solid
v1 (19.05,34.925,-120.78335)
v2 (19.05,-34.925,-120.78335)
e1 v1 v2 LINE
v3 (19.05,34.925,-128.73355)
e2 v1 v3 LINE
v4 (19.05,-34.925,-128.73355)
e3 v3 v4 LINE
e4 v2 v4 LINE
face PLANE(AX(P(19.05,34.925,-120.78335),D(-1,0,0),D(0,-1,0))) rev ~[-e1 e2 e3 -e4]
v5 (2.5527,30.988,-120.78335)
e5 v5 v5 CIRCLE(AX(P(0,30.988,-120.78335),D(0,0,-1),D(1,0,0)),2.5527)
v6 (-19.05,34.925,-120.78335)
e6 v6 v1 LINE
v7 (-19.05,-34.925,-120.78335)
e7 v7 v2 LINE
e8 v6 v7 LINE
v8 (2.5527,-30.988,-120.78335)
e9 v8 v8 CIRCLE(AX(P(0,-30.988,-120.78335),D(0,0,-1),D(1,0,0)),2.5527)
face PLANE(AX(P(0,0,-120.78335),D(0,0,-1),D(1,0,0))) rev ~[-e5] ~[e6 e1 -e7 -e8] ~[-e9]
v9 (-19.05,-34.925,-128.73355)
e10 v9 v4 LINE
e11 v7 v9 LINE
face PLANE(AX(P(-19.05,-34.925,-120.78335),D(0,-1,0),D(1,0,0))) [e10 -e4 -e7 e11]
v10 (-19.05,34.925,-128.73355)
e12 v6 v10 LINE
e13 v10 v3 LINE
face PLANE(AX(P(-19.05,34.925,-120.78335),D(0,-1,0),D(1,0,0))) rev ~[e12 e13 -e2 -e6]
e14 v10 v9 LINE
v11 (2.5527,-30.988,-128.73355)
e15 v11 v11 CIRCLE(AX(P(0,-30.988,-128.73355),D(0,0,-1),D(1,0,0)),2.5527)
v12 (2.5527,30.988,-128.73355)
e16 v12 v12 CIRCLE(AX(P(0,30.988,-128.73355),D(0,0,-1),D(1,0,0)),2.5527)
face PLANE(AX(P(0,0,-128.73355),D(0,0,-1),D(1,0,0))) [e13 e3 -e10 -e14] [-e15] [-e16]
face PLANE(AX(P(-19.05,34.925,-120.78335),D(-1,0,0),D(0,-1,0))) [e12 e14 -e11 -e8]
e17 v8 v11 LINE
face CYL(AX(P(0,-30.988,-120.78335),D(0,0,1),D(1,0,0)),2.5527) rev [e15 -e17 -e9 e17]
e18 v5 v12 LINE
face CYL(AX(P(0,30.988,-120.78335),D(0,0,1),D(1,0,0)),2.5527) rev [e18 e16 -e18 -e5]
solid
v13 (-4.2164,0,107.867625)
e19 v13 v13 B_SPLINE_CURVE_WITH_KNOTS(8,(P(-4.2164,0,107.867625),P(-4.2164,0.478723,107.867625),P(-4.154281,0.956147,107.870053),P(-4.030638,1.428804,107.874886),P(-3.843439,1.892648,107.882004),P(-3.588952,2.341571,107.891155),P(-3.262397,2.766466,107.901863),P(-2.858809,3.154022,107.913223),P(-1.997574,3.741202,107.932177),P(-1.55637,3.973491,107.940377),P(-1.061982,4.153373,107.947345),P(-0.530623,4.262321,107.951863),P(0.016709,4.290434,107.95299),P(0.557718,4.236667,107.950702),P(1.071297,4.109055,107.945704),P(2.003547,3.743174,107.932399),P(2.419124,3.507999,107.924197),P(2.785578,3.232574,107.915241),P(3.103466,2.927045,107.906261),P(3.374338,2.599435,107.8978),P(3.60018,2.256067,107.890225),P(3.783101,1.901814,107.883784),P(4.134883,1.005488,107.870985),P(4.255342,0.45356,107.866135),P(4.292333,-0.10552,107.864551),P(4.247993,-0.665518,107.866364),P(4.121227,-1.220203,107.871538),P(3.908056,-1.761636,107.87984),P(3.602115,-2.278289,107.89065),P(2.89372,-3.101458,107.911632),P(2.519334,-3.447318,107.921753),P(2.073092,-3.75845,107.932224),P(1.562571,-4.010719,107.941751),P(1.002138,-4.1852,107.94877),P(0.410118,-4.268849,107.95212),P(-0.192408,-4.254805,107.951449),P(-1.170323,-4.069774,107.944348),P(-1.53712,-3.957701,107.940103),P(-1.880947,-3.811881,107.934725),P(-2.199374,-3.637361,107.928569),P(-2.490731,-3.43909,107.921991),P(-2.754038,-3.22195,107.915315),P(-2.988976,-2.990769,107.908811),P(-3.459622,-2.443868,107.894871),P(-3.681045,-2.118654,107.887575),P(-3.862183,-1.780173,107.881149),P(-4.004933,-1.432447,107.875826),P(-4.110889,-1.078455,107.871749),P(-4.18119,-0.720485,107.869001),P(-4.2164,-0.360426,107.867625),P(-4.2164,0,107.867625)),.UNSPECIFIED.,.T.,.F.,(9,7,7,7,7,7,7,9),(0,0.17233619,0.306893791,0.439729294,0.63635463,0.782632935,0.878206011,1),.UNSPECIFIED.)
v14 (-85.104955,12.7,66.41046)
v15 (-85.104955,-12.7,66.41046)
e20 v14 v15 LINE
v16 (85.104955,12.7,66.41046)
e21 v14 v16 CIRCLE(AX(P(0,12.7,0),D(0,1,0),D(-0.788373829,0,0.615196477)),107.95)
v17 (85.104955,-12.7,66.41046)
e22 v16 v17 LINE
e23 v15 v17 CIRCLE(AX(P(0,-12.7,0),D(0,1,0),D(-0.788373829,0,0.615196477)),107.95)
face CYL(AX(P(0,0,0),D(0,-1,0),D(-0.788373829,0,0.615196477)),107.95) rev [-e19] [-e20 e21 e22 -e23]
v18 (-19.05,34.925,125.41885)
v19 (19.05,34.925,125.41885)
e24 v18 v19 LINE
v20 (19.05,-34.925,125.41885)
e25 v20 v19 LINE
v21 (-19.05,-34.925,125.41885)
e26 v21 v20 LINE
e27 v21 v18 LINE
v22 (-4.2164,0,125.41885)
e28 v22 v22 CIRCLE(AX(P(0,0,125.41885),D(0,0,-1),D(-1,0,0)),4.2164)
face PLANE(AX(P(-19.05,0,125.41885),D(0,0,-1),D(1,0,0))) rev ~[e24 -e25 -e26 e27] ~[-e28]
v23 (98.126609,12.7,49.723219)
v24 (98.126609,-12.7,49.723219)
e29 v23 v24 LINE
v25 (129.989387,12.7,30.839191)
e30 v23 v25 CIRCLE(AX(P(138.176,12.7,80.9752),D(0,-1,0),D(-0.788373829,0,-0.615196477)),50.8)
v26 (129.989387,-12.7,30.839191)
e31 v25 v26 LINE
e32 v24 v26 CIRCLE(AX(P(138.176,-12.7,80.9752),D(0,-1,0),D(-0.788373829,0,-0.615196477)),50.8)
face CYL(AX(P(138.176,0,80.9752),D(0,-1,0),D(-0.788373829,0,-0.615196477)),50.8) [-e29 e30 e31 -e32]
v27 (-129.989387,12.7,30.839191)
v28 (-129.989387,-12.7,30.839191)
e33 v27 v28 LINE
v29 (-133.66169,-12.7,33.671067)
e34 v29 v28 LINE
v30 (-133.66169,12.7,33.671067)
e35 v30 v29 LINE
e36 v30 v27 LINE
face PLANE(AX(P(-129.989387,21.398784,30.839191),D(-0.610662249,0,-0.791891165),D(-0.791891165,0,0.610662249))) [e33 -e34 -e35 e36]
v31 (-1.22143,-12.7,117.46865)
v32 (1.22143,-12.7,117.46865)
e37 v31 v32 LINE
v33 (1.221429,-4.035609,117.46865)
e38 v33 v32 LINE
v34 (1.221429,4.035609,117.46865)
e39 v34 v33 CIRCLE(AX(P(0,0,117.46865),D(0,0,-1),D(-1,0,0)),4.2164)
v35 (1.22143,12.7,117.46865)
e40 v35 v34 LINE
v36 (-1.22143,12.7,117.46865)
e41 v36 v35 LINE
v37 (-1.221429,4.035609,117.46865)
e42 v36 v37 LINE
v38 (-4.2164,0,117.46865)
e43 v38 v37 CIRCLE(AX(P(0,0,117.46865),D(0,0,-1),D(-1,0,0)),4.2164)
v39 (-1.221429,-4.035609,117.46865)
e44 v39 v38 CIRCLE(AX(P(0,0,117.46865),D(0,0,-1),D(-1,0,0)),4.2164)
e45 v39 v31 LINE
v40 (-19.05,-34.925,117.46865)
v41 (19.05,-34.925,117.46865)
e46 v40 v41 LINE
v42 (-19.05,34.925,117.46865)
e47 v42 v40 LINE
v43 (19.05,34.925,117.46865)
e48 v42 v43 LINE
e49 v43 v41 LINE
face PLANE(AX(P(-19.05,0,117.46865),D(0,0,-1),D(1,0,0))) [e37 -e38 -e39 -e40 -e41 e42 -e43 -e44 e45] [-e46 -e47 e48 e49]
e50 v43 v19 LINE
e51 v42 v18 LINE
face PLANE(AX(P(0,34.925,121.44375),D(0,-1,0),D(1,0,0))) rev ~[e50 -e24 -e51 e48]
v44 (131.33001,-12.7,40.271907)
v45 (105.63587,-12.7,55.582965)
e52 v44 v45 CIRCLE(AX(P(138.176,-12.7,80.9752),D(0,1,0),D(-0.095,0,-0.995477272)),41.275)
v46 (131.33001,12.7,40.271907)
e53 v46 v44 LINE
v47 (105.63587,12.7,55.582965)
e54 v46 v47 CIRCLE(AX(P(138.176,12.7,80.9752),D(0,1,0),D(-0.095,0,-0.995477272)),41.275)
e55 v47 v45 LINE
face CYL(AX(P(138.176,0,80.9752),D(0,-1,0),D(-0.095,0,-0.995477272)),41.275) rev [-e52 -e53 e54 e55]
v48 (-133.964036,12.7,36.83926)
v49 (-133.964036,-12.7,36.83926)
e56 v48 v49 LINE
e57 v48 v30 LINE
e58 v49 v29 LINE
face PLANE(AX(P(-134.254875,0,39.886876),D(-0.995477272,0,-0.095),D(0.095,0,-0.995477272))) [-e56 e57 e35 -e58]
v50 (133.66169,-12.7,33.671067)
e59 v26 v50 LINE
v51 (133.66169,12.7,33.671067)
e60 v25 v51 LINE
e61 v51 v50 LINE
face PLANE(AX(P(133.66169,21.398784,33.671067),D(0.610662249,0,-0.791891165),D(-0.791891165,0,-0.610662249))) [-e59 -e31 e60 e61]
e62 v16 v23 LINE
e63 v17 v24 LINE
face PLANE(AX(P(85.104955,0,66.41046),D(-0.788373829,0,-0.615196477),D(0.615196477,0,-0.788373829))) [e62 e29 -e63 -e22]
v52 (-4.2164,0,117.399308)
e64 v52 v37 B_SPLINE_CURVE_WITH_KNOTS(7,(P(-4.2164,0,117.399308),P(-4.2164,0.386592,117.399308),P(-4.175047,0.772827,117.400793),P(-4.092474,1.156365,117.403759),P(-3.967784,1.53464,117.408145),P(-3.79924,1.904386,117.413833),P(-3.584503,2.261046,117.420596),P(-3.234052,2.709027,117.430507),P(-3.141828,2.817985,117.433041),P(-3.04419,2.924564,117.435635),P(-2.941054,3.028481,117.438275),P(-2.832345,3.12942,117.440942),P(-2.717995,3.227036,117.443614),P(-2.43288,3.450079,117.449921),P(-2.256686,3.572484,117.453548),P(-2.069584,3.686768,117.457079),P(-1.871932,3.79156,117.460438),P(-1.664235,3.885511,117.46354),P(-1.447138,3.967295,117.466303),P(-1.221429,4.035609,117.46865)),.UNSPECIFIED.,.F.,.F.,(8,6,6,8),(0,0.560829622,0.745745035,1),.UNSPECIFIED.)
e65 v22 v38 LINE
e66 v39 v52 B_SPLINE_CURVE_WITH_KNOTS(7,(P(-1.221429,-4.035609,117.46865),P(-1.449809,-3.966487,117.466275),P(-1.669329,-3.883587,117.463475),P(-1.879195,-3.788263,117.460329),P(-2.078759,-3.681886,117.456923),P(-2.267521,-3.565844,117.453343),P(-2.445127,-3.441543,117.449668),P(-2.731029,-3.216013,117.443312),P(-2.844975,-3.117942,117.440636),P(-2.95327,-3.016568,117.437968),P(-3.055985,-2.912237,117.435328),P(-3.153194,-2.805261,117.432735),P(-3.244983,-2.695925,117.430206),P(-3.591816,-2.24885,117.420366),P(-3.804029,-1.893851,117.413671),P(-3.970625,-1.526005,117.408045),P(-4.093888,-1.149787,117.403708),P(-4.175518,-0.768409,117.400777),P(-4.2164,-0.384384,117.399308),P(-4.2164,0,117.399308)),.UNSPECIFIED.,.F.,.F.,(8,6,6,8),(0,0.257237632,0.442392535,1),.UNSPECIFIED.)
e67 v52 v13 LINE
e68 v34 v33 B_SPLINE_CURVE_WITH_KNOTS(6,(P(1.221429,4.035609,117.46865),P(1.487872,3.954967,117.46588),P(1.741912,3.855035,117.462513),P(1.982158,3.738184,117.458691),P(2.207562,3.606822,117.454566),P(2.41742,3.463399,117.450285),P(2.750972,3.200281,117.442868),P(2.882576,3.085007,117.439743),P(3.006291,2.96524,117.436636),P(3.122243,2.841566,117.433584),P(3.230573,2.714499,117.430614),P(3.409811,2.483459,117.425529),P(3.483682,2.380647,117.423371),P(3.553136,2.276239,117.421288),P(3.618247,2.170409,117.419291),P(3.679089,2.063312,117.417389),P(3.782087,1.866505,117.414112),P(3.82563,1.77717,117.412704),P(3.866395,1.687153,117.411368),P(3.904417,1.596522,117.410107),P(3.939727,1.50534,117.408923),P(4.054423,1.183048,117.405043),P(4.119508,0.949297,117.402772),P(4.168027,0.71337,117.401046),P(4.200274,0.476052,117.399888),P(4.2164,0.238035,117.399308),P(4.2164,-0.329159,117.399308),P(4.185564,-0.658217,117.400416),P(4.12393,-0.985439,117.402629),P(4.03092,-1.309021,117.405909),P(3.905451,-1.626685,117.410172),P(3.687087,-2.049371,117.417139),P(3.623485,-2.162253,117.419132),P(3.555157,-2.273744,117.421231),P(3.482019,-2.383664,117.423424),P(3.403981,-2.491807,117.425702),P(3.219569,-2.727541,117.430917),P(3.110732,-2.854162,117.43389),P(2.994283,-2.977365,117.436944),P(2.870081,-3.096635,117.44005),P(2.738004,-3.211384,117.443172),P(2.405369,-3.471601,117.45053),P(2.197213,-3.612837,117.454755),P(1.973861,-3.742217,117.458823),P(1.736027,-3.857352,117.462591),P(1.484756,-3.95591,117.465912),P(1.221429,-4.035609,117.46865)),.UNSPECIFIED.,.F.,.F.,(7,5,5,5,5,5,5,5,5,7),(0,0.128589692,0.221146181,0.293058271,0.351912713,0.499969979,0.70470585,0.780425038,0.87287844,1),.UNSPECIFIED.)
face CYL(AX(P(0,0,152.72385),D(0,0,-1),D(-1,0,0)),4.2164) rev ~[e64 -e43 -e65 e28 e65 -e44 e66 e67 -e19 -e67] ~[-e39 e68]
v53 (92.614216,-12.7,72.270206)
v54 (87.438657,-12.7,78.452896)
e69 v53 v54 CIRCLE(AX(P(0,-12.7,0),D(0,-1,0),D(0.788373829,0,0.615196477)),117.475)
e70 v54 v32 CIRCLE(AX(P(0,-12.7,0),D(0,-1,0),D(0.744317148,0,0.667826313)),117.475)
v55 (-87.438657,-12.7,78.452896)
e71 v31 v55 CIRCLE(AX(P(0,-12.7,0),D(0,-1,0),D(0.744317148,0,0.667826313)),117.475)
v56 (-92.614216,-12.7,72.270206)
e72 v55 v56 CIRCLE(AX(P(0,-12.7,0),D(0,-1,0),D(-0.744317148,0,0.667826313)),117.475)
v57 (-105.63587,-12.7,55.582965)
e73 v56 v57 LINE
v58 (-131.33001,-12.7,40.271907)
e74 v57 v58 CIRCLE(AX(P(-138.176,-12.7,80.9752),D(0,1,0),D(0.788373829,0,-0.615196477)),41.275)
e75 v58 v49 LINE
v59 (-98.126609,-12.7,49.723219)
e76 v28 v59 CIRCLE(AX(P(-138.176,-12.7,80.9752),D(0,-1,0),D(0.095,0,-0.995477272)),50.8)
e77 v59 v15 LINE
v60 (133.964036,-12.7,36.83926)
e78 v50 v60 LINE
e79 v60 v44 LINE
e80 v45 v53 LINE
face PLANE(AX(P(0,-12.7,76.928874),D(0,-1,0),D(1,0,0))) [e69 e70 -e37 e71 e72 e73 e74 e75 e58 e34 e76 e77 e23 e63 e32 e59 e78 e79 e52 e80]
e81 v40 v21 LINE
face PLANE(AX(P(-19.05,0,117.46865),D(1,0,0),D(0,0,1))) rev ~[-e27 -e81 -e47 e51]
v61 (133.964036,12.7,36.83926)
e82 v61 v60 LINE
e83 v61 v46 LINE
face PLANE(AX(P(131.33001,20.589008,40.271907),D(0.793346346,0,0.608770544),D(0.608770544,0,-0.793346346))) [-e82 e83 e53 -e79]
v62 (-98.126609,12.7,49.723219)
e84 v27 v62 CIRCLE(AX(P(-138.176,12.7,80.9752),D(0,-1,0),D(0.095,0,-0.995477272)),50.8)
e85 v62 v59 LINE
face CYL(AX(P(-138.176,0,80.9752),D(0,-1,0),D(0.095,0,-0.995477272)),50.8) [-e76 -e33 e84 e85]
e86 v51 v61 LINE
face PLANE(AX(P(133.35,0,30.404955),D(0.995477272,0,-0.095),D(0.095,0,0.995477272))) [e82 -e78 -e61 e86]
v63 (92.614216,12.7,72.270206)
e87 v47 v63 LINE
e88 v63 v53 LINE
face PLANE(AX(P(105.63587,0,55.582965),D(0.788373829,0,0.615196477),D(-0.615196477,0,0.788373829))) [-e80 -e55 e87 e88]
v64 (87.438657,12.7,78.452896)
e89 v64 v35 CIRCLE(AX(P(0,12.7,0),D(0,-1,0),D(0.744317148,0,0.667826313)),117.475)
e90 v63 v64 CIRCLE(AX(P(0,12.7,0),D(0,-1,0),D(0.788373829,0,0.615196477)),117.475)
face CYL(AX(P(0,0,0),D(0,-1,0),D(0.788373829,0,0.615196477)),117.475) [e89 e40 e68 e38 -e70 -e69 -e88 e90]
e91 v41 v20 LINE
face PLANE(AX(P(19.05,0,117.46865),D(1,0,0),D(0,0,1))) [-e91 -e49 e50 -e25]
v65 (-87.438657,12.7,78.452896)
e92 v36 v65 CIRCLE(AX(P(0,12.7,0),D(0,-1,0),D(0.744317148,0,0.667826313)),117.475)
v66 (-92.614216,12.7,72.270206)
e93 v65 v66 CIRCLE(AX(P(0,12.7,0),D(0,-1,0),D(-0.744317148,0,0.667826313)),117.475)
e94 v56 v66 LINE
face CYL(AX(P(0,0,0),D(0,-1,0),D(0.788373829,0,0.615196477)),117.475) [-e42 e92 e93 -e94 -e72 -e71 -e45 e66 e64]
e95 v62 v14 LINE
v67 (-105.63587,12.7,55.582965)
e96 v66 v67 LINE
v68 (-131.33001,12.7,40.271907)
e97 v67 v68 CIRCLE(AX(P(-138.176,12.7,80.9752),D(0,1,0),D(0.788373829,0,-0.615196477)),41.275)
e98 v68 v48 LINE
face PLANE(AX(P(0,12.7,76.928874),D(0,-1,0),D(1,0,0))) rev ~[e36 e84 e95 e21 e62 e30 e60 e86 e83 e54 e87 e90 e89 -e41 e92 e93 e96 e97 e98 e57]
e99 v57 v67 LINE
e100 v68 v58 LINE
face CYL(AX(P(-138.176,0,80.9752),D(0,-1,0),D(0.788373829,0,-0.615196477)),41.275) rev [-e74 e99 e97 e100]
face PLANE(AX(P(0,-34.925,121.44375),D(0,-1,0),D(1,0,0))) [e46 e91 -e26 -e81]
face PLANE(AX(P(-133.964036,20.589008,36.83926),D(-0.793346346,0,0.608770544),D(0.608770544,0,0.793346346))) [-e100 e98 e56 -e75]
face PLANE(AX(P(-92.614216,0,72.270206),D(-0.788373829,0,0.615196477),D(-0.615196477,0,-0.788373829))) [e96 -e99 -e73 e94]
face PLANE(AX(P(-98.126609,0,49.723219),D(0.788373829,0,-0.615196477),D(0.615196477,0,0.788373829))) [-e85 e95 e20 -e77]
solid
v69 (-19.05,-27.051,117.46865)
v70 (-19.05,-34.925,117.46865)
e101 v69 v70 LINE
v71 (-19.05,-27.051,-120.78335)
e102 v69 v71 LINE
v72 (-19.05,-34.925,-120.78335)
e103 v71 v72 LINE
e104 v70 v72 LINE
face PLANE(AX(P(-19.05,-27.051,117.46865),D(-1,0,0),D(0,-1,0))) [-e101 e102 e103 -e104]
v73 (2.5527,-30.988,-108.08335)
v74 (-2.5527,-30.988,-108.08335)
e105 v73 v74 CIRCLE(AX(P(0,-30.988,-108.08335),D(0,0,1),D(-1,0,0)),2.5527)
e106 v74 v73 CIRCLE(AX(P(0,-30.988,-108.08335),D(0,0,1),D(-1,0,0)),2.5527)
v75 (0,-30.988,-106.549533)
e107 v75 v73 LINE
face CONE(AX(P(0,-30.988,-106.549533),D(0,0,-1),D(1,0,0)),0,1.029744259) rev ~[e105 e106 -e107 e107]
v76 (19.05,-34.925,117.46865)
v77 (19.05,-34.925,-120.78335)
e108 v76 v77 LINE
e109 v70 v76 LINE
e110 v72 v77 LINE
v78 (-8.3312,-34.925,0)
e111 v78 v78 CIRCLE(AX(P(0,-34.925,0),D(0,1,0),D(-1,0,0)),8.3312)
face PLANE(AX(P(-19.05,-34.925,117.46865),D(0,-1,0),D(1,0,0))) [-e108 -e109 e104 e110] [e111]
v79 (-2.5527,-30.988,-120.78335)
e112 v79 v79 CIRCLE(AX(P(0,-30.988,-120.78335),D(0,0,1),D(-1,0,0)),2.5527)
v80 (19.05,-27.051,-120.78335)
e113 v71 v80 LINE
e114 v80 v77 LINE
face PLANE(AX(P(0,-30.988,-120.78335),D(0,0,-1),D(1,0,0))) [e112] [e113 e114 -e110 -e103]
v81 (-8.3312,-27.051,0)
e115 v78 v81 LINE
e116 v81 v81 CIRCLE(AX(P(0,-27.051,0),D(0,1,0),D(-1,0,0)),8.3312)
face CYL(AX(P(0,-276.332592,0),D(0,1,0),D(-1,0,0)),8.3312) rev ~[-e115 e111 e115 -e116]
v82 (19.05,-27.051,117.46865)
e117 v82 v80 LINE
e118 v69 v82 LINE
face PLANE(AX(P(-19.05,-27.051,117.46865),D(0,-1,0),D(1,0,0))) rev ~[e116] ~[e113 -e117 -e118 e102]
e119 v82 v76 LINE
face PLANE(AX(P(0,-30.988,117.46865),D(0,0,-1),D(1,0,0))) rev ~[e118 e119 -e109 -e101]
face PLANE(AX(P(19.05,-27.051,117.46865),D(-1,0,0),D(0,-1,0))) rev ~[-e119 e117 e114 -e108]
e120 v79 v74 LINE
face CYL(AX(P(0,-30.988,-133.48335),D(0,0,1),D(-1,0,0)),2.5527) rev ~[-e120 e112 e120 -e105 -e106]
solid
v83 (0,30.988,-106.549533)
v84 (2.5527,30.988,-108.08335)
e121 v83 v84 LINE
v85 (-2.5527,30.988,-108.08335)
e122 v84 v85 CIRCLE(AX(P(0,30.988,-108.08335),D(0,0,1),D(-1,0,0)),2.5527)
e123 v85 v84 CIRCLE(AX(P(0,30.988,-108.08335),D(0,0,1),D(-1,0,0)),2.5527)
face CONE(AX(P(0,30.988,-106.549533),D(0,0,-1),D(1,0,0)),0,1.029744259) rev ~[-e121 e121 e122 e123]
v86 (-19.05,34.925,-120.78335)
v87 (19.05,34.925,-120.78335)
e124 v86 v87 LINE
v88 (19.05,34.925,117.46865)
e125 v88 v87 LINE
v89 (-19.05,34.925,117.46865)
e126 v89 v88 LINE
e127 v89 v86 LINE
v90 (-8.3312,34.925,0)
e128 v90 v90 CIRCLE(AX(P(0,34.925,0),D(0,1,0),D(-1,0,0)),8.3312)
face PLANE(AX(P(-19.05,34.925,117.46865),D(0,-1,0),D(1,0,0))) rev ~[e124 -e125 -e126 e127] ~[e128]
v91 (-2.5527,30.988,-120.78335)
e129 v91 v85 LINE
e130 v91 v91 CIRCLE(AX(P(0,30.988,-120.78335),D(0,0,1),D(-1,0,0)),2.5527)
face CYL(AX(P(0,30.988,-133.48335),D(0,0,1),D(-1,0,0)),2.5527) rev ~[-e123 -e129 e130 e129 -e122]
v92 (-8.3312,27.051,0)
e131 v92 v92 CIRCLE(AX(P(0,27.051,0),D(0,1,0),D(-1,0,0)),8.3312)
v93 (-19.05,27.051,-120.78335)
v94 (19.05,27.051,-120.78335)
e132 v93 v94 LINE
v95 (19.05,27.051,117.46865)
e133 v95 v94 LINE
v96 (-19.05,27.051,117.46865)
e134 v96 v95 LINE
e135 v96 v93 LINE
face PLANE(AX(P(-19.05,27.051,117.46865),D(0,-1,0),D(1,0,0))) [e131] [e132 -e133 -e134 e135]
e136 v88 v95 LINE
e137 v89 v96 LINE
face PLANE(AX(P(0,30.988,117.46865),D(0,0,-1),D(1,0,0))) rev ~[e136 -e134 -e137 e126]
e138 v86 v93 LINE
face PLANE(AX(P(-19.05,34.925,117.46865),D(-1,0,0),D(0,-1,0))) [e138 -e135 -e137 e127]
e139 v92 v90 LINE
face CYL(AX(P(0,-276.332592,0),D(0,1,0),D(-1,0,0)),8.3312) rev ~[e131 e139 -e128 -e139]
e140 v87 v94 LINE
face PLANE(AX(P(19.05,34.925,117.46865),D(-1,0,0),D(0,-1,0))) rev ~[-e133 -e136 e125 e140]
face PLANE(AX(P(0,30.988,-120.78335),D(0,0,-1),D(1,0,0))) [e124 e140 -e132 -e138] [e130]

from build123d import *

# Parameters (mm, degrees)
F1_DEPTH    = 12.7
F2_T1_DEPTH = 41.1780168926
F2_T3_DEPTH = 42.797567125
F3_W        = 38.1
F3_H        = 7.9502
F4_DEPTH    = 34.925
F5_W        = 38.1
F5_H        = 7.874
F6_DEPTH    = 238.252
F8_D        = 16.6624
F8_2_D      = 16.6624
F10_D       = 5.1054
F10_DEPTH   = 12.7
F10_TIP     = 1.5338169022
F10_2_D     = 5.1054
F10_2_DEPTH = 12.7
F10_2_TIP   = 1.5338169022
F12_D       = 8.4328
F12_DEPTH   = 27.305
F12_TIP     = 2.5334687141
F13_W       = 38.1
F13_H       = 69.85
F13_R       = 2.5527
F14_DEPTH   = 7.9502


# Not quite as in the source:
# - a fillet or chamfer that OpenCascade refuses, or shapes differently, is made with other operations: its cross-section is extruded or revolved along the edge and cut away or added


with BuildPart() as f1:
    # F0 (on Front) → F1 (new body, symmetric)
    with BuildSketch(Plane.XZ):
        with BuildLine():
            Line((-134.254875, 39.8868755789), (-133.35, 30.4049545586))
            ThreePointArc((-133.35, 30.4049545586), (-113.74755339, 36.4343087177), (-98.1266094704, 49.7232189715))
            Line((-98.1266094704, 49.7232189715), (-85.1049548754, 66.4104596856))
            ThreePointArc((-85.1049548754, 66.4104596856), (0, 107.95), (85.1049548754, 66.4104596856))
            Line((85.1049548754, 66.4104596856), (98.1266094704, 49.7232189715))
            ThreePointArc((98.1266094704, 49.7232189715), (113.74755339, 36.4343087177), (133.35, 30.4049545586))
            Line((133.35, 30.4049545586), (134.254875, 39.8868755789))
            ThreePointArc((134.254875, 39.8868755789), (118.3278871294, 44.7857258331), (105.6358701947, 55.5829654143))
            Line((105.6358701947, 55.5829654143), (92.6142155997, 72.2702061284))
            ThreePointArc((92.6142155997, 72.2702061284), (90.0794962204, 75.4059678386), (87.4386569195, 78.4528960658))
            ThreePointArc((87.4386569195, 78.4528960658), (0, 117.475), (-87.4386569195, 78.4528960658))
            ThreePointArc((-87.4386569195, 78.4528960658), (-90.0794962204, 75.4059678386), (-92.6142155997, 72.2702061284))
            Line((-92.6142155997, 72.2702061284), (-105.6358701947, 55.5829654143))
            ThreePointArc((-105.6358701947, 55.5829654143), (-118.3278871294, 44.7857258331), (-134.254875, 39.8868755789))
        make_face()
    extrude(amount=F1_DEPTH, both=True)

    # F2: chamfer of 3.175 on 4 edges, made by hand

    # F2_s2 → F2_t1 (cut)
    with BuildSketch(Plane.XZ.offset(-20.5890084463)):
        with BuildLine():
            Line((131.3300103455, 40.2719071277), (133.9640360968, 36.839259599))
            Line((133.9640360968, 36.839259599), (134.254875, 39.8868755789))
            ThreePointArc((134.254875, 39.8868755789), (132.7444106107, 40.0591461616), (131.3300103455, 40.2719071277))
        make_face()
        with BuildLine():
            Line((-133.9640360968, 36.839259599), (-131.3300103455, 40.2719071277))
            ThreePointArc((-131.3300103455, 40.2719071277), (-132.7444106107, 40.0591461616), (-134.254875, 39.8868755789))
            Line((-134.254875, 39.8868755789), (-133.9640360968, 36.839259599))
        make_face()
    extrude(amount=F2_T1_DEPTH, mode=Mode.SUBTRACT)

    # F2_s4 → F2_t3 (cut)
    with BuildSketch(Plane.XZ.offset(-21.3987835625)):
        with BuildLine():
            Line((133.6616903629, 33.6710668983), (129.989386691, 30.8391913582))
            ThreePointArc((129.989386691, 30.8391913582), (131.6215577531, 30.5998162612), (133.35, 30.4049545586))
            Line((133.35, 30.4049545586), (133.6616903629, 33.6710668983))
        make_face()
        with BuildLine():
            Line((-129.989386691, 30.8391913582), (-133.6616903629, 33.6710668983))
            Line((-133.6616903629, 33.6710668983), (-133.35, 30.4049545586))
            ThreePointArc((-133.35, 30.4049545586), (-131.6215577531, 30.5998162612), (-129.989386691, 30.8391913582))
        make_face()
    extrude(amount=F2_T3_DEPTH, mode=Mode.SUBTRACT)

    # F3 (on Front) → F4 (join, symmetric)
    with BuildSketch(Plane.XZ):
        with Locations((0, 121.44375)):
            Rectangle(F3_W, F3_H)
    extrude(amount=F4_DEPTH, both=True)

    # F12
    with Locations(Plane.XY.offset(125.41885)):
        with Locations((0, 0)):
            Hole(F12_D / 2, depth=F12_DEPTH)
            with Locations((0, 0, -(F12_DEPTH + F12_TIP / 2))):  # 118° drill point
                Cone(0, F12_D / 2, F12_TIP, mode=Mode.SUBTRACT)


with BuildPart() as f6:
    # F5 (on face) → F6 (new body)
    with BuildSketch(Plane(origin=(0, 0, 117.46865), x_dir=(1, 0, 0), z_dir=(0, 0, -1))):
        with Locations((0, 30.988)):
            Rectangle(F5_W, F5_H)
    extrude(amount=F6_DEPTH)

    # F8 (through all)
    with Locations(Plane.XZ.offset(34.925)):
        with Locations((0, 0)):
            Hole(F8_D / 2)

    # F10
    with Locations(Plane(origin=(0, 0, -120.78335), x_dir=(1, 0, 0), z_dir=(0, 0, -1))):
        with Locations((0, 30.988), (0, -30.988)):
            Hole(F10_D / 2, depth=F10_DEPTH)
            with Locations((0, 0, -(F10_DEPTH + F10_TIP / 2))):  # 118° drill point
                Cone(0, F10_D / 2, F10_TIP, mode=Mode.SUBTRACT)


with BuildPart() as f6b:
    # F5 (on face) → F6, piece 2 (new body)
    with BuildSketch(Plane(origin=(0, 0, 117.46865), x_dir=(1, 0, 0), z_dir=(0, 0, -1))):
        with Locations((0, -30.988)):
            Rectangle(F5_W, F5_H)
    extrude(amount=F6_DEPTH)

    # F8#2 (through all)
    with Locations(Plane.XZ.offset(34.925)):
        with Locations((0, 0)):
            Hole(F8_2_D / 2)

    # F10#2
    with Locations(Plane(origin=(0, 0, -120.78335), x_dir=(1, 0, 0), z_dir=(0, 0, -1))):
        with Locations((0, 30.988), (0, -30.988)):
            Hole(F10_2_D / 2, depth=F10_2_DEPTH)
            with Locations((0, 0, -(F10_2_DEPTH + F10_2_TIP / 2))):  # 118° drill point
                Cone(0, F10_2_D / 2, F10_2_TIP, mode=Mode.SUBTRACT)


with BuildPart() as f14:
    # F13 (on face) → F14 (new body)
    with BuildSketch(Plane(origin=(0, 0, -120.78335), x_dir=(1, 0, 0), z_dir=(0, 0, -1))):
        Rectangle(F13_W, F13_H)
        with Locations((0, -30.988)):
            Circle(F13_R, mode=Mode.SUBTRACT)
        with Locations((0, 30.988)):
            Circle(F13_R, mode=Mode.SUBTRACT)
    extrude(amount=F14_DEPTH)


solid = Compound([f1.part, f6.part, f6b.part, f14.part])
